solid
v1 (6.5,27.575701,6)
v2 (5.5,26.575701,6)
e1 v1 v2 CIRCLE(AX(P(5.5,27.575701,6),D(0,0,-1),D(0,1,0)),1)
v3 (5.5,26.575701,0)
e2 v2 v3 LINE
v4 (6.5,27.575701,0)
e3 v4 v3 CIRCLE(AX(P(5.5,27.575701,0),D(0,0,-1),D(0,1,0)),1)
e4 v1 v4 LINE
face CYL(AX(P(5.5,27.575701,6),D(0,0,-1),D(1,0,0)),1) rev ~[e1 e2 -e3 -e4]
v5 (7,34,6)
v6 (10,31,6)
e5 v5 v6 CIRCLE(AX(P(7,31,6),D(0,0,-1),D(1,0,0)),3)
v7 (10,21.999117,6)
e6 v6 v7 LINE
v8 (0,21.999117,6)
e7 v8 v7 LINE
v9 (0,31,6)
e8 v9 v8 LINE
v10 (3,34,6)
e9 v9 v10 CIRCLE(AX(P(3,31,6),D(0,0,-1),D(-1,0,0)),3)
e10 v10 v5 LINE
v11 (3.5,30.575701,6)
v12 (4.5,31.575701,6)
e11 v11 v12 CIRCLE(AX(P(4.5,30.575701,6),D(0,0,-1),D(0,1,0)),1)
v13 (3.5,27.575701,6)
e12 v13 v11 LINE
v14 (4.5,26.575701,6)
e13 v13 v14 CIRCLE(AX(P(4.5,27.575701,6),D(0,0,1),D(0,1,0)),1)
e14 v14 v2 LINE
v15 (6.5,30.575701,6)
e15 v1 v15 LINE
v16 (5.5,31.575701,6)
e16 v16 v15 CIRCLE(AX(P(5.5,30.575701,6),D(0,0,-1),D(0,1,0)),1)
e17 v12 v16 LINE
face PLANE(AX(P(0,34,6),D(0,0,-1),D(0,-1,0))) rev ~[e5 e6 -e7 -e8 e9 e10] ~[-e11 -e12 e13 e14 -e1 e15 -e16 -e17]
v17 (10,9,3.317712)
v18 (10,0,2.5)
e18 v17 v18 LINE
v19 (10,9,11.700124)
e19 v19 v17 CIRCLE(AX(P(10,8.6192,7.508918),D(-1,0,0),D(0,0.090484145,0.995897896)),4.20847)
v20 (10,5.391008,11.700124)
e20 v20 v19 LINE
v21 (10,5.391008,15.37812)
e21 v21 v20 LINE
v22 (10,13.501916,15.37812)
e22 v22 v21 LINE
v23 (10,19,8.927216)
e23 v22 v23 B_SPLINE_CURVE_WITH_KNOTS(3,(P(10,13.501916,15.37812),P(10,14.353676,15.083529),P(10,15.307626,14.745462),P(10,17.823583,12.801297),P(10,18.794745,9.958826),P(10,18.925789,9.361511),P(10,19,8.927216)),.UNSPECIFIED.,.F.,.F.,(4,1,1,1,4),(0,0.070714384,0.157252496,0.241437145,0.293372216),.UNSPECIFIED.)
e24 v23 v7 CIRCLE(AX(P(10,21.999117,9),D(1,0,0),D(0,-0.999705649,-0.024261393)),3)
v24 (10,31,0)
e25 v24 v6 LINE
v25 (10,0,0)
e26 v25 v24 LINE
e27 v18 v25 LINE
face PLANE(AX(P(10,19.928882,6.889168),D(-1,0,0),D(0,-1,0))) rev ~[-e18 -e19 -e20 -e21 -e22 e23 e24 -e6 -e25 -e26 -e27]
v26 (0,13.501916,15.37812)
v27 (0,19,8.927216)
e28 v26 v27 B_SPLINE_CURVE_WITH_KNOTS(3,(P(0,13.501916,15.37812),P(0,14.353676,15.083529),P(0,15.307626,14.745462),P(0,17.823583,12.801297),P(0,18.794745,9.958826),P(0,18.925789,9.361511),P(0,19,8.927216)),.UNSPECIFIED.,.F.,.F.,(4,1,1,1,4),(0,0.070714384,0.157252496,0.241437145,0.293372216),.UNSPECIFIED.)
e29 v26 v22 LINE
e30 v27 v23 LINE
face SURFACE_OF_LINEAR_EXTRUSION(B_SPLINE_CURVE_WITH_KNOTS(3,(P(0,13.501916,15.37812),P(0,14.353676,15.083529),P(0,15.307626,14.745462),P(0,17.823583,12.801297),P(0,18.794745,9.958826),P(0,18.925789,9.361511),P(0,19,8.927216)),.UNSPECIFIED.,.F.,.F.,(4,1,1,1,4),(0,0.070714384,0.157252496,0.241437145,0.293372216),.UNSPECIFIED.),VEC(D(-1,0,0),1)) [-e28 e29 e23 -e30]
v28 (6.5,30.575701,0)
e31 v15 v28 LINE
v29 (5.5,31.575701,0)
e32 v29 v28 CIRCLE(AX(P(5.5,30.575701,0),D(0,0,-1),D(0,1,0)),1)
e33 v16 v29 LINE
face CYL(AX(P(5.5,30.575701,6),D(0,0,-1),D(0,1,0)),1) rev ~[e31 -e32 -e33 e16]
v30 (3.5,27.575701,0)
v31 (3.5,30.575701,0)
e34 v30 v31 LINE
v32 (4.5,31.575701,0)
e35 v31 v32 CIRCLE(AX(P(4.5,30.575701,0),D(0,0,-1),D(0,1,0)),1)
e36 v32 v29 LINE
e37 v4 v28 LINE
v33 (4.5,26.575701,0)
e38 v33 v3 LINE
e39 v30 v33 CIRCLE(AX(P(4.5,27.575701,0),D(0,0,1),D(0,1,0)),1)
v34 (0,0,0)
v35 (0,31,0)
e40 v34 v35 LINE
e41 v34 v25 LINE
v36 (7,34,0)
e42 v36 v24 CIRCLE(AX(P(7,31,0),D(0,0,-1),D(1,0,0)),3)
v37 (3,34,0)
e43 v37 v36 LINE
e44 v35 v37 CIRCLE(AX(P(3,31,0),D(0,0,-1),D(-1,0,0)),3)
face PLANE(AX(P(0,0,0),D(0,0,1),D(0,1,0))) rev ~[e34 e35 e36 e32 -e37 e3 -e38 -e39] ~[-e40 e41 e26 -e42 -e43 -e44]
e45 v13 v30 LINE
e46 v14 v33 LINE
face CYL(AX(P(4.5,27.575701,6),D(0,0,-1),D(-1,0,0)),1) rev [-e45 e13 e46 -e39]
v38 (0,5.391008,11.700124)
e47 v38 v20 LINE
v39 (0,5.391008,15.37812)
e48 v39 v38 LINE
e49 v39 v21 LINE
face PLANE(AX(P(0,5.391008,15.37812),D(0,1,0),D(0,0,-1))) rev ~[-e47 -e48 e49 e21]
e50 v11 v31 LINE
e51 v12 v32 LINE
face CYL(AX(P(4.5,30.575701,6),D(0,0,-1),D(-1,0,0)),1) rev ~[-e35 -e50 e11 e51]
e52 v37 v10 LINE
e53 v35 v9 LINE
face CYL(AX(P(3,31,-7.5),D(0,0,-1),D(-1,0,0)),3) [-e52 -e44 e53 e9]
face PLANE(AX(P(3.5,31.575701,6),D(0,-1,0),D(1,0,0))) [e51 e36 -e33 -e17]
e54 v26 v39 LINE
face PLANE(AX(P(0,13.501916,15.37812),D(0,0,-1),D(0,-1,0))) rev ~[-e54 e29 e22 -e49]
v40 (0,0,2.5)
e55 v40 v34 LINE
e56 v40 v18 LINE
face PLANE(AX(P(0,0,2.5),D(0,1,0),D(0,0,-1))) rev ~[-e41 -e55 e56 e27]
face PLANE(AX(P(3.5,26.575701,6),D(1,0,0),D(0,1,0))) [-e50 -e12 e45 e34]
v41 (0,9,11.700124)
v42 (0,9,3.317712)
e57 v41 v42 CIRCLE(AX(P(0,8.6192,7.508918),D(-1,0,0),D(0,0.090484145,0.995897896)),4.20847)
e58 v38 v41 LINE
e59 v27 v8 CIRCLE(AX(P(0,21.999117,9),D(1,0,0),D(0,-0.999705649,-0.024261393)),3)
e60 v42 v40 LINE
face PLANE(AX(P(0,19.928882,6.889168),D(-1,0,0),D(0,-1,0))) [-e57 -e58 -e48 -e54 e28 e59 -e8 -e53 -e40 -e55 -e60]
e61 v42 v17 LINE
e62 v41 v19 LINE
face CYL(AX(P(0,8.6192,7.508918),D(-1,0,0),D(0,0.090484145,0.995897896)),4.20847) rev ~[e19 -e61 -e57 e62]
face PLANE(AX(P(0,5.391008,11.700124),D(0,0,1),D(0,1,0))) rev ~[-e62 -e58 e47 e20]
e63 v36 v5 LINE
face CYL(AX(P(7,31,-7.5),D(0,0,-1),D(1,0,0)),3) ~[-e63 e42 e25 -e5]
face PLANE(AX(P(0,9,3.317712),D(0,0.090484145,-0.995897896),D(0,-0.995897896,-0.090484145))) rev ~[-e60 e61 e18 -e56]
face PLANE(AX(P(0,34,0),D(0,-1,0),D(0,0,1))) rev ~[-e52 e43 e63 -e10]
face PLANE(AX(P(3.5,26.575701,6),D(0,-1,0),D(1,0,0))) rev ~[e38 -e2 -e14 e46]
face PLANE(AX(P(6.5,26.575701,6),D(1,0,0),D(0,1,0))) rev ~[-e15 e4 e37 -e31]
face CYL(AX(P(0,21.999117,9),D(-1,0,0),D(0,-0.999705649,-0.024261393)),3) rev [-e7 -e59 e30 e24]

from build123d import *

# Parameters (mm, degrees)
F1_DEPTH    = 10
F2_T1_DEPTH = 10
F2_T3_DEPTH = 21
F2_T5_DEPTH = 21
F3_W        = 3
F3_H        = 5
F4_DEPTH    = 25
F5_R        = 1


# Not quite as in the source:
# - a fillet or chamfer that OpenCascade refuses, or shapes differently, is made with other operations: its cross-section is extruded or revolved along the edge and cut away or added


with BuildPart() as f1:
    # F0 (on Right) → F1 (new body)
    with BuildSketch(Plane.YZ):
        with BuildLine():
            Line((0, 2.5), (0, 0))
            Line((0, 0), (34, 0))
            Line((34, 0), (34, 6))
            Line((34, 6), (19, 6))
            Line((19, 6), (19, 8.927215822))
            add(Edge.make_bspline(
                [(13.5019160807, 15.3781203553), (14.3536763756, 15.0835294533), (15.3076259705, 14.7454615797), (17.8235832578, 12.8012966962), (18.7947445626, 9.9588259689), (18.9257892428, 9.3615105358), (19, 8.927215822)],
                knots=[0, 0, 0, 0, 0.0707143844, 0.1572524963, 0.2414371446, 0.2933722159, 0.2933722159, 0.2933722159, 0.2933722159], degree=3))
            Line((13.5019160807, 15.3781203553), (5.3910082206, 15.3781203553))
            Line((5.3910082206, 15.3781203553), (5.3910082206, 13.2812492201))
            Line((5.3910082206, 13.2812492201), (5.3910082206, 11.7001235485))
            Line((5.3910082206, 11.7001235485), (9, 11.7001235485))
            ThreePointArc((9, 11.7001235485), (12.8276697655, 7.5089175953), (9, 3.317711642))
            Line((9, 3.317711642), (0, 2.5))
        make_face()
    extrude(amount=F1_DEPTH)

    # F2: fillet of radius 3 on 3 edges, made by hand

    # F2_s2 → F2_t1 (join)
    with BuildSketch(Plane.YZ):
        with BuildLine():
            ThreePointArc((19, 8.927215822), (19.9036876994, 6.8531007786), (21.9991169473, 6))
            Line((21.9991169473, 6), (19, 6))
            Line((19, 6), (19, 8.927215822))
        make_face()
    extrude(amount=F2_T1_DEPTH)

    # F2_s4 → F2_t3 (cut)
    with BuildSketch(Plane.XY.offset(-7.5)):
        with BuildLine():
            ThreePointArc((10, 31), (9.1213203436, 33.1213203436), (7, 34))
            Line((7, 34), (10, 34))
            Line((10, 34), (10, 31))
        make_face()
    extrude(amount=F2_T3_DEPTH, mode=Mode.SUBTRACT)

    # F2_s6 → F2_t5 (cut)
    with BuildSketch(Plane.XY.offset(-7.5)):
        with BuildLine():
            ThreePointArc((0, 31), (0.8786796564, 33.1213203436), (3, 34))
            Line((3, 34), (0, 34))
            Line((0, 34), (0, 31))
        make_face()
    extrude(amount=F2_T5_DEPTH, mode=Mode.SUBTRACT)

    # F3 (on face) → F4 (cut)
    with BuildSketch(Plane.XY.offset(6)):
        with Locations((5, 29.0757007897)):
            Rectangle(F3_W, F3_H)
    extrude(amount=-F4_DEPTH, mode=Mode.SUBTRACT)

    # F5
    f5_edges = [f1.edges().sort_by_distance(p)[0] for p in [
        (3.5, 26.575701, 3),
        (3.5, 31.575701, 3),
        (6.5, 26.575701, 3),
        (6.5, 31.575701, 3),
    ]]
    fillet(f5_edges, radius=F5_R)


solid = f1.part
